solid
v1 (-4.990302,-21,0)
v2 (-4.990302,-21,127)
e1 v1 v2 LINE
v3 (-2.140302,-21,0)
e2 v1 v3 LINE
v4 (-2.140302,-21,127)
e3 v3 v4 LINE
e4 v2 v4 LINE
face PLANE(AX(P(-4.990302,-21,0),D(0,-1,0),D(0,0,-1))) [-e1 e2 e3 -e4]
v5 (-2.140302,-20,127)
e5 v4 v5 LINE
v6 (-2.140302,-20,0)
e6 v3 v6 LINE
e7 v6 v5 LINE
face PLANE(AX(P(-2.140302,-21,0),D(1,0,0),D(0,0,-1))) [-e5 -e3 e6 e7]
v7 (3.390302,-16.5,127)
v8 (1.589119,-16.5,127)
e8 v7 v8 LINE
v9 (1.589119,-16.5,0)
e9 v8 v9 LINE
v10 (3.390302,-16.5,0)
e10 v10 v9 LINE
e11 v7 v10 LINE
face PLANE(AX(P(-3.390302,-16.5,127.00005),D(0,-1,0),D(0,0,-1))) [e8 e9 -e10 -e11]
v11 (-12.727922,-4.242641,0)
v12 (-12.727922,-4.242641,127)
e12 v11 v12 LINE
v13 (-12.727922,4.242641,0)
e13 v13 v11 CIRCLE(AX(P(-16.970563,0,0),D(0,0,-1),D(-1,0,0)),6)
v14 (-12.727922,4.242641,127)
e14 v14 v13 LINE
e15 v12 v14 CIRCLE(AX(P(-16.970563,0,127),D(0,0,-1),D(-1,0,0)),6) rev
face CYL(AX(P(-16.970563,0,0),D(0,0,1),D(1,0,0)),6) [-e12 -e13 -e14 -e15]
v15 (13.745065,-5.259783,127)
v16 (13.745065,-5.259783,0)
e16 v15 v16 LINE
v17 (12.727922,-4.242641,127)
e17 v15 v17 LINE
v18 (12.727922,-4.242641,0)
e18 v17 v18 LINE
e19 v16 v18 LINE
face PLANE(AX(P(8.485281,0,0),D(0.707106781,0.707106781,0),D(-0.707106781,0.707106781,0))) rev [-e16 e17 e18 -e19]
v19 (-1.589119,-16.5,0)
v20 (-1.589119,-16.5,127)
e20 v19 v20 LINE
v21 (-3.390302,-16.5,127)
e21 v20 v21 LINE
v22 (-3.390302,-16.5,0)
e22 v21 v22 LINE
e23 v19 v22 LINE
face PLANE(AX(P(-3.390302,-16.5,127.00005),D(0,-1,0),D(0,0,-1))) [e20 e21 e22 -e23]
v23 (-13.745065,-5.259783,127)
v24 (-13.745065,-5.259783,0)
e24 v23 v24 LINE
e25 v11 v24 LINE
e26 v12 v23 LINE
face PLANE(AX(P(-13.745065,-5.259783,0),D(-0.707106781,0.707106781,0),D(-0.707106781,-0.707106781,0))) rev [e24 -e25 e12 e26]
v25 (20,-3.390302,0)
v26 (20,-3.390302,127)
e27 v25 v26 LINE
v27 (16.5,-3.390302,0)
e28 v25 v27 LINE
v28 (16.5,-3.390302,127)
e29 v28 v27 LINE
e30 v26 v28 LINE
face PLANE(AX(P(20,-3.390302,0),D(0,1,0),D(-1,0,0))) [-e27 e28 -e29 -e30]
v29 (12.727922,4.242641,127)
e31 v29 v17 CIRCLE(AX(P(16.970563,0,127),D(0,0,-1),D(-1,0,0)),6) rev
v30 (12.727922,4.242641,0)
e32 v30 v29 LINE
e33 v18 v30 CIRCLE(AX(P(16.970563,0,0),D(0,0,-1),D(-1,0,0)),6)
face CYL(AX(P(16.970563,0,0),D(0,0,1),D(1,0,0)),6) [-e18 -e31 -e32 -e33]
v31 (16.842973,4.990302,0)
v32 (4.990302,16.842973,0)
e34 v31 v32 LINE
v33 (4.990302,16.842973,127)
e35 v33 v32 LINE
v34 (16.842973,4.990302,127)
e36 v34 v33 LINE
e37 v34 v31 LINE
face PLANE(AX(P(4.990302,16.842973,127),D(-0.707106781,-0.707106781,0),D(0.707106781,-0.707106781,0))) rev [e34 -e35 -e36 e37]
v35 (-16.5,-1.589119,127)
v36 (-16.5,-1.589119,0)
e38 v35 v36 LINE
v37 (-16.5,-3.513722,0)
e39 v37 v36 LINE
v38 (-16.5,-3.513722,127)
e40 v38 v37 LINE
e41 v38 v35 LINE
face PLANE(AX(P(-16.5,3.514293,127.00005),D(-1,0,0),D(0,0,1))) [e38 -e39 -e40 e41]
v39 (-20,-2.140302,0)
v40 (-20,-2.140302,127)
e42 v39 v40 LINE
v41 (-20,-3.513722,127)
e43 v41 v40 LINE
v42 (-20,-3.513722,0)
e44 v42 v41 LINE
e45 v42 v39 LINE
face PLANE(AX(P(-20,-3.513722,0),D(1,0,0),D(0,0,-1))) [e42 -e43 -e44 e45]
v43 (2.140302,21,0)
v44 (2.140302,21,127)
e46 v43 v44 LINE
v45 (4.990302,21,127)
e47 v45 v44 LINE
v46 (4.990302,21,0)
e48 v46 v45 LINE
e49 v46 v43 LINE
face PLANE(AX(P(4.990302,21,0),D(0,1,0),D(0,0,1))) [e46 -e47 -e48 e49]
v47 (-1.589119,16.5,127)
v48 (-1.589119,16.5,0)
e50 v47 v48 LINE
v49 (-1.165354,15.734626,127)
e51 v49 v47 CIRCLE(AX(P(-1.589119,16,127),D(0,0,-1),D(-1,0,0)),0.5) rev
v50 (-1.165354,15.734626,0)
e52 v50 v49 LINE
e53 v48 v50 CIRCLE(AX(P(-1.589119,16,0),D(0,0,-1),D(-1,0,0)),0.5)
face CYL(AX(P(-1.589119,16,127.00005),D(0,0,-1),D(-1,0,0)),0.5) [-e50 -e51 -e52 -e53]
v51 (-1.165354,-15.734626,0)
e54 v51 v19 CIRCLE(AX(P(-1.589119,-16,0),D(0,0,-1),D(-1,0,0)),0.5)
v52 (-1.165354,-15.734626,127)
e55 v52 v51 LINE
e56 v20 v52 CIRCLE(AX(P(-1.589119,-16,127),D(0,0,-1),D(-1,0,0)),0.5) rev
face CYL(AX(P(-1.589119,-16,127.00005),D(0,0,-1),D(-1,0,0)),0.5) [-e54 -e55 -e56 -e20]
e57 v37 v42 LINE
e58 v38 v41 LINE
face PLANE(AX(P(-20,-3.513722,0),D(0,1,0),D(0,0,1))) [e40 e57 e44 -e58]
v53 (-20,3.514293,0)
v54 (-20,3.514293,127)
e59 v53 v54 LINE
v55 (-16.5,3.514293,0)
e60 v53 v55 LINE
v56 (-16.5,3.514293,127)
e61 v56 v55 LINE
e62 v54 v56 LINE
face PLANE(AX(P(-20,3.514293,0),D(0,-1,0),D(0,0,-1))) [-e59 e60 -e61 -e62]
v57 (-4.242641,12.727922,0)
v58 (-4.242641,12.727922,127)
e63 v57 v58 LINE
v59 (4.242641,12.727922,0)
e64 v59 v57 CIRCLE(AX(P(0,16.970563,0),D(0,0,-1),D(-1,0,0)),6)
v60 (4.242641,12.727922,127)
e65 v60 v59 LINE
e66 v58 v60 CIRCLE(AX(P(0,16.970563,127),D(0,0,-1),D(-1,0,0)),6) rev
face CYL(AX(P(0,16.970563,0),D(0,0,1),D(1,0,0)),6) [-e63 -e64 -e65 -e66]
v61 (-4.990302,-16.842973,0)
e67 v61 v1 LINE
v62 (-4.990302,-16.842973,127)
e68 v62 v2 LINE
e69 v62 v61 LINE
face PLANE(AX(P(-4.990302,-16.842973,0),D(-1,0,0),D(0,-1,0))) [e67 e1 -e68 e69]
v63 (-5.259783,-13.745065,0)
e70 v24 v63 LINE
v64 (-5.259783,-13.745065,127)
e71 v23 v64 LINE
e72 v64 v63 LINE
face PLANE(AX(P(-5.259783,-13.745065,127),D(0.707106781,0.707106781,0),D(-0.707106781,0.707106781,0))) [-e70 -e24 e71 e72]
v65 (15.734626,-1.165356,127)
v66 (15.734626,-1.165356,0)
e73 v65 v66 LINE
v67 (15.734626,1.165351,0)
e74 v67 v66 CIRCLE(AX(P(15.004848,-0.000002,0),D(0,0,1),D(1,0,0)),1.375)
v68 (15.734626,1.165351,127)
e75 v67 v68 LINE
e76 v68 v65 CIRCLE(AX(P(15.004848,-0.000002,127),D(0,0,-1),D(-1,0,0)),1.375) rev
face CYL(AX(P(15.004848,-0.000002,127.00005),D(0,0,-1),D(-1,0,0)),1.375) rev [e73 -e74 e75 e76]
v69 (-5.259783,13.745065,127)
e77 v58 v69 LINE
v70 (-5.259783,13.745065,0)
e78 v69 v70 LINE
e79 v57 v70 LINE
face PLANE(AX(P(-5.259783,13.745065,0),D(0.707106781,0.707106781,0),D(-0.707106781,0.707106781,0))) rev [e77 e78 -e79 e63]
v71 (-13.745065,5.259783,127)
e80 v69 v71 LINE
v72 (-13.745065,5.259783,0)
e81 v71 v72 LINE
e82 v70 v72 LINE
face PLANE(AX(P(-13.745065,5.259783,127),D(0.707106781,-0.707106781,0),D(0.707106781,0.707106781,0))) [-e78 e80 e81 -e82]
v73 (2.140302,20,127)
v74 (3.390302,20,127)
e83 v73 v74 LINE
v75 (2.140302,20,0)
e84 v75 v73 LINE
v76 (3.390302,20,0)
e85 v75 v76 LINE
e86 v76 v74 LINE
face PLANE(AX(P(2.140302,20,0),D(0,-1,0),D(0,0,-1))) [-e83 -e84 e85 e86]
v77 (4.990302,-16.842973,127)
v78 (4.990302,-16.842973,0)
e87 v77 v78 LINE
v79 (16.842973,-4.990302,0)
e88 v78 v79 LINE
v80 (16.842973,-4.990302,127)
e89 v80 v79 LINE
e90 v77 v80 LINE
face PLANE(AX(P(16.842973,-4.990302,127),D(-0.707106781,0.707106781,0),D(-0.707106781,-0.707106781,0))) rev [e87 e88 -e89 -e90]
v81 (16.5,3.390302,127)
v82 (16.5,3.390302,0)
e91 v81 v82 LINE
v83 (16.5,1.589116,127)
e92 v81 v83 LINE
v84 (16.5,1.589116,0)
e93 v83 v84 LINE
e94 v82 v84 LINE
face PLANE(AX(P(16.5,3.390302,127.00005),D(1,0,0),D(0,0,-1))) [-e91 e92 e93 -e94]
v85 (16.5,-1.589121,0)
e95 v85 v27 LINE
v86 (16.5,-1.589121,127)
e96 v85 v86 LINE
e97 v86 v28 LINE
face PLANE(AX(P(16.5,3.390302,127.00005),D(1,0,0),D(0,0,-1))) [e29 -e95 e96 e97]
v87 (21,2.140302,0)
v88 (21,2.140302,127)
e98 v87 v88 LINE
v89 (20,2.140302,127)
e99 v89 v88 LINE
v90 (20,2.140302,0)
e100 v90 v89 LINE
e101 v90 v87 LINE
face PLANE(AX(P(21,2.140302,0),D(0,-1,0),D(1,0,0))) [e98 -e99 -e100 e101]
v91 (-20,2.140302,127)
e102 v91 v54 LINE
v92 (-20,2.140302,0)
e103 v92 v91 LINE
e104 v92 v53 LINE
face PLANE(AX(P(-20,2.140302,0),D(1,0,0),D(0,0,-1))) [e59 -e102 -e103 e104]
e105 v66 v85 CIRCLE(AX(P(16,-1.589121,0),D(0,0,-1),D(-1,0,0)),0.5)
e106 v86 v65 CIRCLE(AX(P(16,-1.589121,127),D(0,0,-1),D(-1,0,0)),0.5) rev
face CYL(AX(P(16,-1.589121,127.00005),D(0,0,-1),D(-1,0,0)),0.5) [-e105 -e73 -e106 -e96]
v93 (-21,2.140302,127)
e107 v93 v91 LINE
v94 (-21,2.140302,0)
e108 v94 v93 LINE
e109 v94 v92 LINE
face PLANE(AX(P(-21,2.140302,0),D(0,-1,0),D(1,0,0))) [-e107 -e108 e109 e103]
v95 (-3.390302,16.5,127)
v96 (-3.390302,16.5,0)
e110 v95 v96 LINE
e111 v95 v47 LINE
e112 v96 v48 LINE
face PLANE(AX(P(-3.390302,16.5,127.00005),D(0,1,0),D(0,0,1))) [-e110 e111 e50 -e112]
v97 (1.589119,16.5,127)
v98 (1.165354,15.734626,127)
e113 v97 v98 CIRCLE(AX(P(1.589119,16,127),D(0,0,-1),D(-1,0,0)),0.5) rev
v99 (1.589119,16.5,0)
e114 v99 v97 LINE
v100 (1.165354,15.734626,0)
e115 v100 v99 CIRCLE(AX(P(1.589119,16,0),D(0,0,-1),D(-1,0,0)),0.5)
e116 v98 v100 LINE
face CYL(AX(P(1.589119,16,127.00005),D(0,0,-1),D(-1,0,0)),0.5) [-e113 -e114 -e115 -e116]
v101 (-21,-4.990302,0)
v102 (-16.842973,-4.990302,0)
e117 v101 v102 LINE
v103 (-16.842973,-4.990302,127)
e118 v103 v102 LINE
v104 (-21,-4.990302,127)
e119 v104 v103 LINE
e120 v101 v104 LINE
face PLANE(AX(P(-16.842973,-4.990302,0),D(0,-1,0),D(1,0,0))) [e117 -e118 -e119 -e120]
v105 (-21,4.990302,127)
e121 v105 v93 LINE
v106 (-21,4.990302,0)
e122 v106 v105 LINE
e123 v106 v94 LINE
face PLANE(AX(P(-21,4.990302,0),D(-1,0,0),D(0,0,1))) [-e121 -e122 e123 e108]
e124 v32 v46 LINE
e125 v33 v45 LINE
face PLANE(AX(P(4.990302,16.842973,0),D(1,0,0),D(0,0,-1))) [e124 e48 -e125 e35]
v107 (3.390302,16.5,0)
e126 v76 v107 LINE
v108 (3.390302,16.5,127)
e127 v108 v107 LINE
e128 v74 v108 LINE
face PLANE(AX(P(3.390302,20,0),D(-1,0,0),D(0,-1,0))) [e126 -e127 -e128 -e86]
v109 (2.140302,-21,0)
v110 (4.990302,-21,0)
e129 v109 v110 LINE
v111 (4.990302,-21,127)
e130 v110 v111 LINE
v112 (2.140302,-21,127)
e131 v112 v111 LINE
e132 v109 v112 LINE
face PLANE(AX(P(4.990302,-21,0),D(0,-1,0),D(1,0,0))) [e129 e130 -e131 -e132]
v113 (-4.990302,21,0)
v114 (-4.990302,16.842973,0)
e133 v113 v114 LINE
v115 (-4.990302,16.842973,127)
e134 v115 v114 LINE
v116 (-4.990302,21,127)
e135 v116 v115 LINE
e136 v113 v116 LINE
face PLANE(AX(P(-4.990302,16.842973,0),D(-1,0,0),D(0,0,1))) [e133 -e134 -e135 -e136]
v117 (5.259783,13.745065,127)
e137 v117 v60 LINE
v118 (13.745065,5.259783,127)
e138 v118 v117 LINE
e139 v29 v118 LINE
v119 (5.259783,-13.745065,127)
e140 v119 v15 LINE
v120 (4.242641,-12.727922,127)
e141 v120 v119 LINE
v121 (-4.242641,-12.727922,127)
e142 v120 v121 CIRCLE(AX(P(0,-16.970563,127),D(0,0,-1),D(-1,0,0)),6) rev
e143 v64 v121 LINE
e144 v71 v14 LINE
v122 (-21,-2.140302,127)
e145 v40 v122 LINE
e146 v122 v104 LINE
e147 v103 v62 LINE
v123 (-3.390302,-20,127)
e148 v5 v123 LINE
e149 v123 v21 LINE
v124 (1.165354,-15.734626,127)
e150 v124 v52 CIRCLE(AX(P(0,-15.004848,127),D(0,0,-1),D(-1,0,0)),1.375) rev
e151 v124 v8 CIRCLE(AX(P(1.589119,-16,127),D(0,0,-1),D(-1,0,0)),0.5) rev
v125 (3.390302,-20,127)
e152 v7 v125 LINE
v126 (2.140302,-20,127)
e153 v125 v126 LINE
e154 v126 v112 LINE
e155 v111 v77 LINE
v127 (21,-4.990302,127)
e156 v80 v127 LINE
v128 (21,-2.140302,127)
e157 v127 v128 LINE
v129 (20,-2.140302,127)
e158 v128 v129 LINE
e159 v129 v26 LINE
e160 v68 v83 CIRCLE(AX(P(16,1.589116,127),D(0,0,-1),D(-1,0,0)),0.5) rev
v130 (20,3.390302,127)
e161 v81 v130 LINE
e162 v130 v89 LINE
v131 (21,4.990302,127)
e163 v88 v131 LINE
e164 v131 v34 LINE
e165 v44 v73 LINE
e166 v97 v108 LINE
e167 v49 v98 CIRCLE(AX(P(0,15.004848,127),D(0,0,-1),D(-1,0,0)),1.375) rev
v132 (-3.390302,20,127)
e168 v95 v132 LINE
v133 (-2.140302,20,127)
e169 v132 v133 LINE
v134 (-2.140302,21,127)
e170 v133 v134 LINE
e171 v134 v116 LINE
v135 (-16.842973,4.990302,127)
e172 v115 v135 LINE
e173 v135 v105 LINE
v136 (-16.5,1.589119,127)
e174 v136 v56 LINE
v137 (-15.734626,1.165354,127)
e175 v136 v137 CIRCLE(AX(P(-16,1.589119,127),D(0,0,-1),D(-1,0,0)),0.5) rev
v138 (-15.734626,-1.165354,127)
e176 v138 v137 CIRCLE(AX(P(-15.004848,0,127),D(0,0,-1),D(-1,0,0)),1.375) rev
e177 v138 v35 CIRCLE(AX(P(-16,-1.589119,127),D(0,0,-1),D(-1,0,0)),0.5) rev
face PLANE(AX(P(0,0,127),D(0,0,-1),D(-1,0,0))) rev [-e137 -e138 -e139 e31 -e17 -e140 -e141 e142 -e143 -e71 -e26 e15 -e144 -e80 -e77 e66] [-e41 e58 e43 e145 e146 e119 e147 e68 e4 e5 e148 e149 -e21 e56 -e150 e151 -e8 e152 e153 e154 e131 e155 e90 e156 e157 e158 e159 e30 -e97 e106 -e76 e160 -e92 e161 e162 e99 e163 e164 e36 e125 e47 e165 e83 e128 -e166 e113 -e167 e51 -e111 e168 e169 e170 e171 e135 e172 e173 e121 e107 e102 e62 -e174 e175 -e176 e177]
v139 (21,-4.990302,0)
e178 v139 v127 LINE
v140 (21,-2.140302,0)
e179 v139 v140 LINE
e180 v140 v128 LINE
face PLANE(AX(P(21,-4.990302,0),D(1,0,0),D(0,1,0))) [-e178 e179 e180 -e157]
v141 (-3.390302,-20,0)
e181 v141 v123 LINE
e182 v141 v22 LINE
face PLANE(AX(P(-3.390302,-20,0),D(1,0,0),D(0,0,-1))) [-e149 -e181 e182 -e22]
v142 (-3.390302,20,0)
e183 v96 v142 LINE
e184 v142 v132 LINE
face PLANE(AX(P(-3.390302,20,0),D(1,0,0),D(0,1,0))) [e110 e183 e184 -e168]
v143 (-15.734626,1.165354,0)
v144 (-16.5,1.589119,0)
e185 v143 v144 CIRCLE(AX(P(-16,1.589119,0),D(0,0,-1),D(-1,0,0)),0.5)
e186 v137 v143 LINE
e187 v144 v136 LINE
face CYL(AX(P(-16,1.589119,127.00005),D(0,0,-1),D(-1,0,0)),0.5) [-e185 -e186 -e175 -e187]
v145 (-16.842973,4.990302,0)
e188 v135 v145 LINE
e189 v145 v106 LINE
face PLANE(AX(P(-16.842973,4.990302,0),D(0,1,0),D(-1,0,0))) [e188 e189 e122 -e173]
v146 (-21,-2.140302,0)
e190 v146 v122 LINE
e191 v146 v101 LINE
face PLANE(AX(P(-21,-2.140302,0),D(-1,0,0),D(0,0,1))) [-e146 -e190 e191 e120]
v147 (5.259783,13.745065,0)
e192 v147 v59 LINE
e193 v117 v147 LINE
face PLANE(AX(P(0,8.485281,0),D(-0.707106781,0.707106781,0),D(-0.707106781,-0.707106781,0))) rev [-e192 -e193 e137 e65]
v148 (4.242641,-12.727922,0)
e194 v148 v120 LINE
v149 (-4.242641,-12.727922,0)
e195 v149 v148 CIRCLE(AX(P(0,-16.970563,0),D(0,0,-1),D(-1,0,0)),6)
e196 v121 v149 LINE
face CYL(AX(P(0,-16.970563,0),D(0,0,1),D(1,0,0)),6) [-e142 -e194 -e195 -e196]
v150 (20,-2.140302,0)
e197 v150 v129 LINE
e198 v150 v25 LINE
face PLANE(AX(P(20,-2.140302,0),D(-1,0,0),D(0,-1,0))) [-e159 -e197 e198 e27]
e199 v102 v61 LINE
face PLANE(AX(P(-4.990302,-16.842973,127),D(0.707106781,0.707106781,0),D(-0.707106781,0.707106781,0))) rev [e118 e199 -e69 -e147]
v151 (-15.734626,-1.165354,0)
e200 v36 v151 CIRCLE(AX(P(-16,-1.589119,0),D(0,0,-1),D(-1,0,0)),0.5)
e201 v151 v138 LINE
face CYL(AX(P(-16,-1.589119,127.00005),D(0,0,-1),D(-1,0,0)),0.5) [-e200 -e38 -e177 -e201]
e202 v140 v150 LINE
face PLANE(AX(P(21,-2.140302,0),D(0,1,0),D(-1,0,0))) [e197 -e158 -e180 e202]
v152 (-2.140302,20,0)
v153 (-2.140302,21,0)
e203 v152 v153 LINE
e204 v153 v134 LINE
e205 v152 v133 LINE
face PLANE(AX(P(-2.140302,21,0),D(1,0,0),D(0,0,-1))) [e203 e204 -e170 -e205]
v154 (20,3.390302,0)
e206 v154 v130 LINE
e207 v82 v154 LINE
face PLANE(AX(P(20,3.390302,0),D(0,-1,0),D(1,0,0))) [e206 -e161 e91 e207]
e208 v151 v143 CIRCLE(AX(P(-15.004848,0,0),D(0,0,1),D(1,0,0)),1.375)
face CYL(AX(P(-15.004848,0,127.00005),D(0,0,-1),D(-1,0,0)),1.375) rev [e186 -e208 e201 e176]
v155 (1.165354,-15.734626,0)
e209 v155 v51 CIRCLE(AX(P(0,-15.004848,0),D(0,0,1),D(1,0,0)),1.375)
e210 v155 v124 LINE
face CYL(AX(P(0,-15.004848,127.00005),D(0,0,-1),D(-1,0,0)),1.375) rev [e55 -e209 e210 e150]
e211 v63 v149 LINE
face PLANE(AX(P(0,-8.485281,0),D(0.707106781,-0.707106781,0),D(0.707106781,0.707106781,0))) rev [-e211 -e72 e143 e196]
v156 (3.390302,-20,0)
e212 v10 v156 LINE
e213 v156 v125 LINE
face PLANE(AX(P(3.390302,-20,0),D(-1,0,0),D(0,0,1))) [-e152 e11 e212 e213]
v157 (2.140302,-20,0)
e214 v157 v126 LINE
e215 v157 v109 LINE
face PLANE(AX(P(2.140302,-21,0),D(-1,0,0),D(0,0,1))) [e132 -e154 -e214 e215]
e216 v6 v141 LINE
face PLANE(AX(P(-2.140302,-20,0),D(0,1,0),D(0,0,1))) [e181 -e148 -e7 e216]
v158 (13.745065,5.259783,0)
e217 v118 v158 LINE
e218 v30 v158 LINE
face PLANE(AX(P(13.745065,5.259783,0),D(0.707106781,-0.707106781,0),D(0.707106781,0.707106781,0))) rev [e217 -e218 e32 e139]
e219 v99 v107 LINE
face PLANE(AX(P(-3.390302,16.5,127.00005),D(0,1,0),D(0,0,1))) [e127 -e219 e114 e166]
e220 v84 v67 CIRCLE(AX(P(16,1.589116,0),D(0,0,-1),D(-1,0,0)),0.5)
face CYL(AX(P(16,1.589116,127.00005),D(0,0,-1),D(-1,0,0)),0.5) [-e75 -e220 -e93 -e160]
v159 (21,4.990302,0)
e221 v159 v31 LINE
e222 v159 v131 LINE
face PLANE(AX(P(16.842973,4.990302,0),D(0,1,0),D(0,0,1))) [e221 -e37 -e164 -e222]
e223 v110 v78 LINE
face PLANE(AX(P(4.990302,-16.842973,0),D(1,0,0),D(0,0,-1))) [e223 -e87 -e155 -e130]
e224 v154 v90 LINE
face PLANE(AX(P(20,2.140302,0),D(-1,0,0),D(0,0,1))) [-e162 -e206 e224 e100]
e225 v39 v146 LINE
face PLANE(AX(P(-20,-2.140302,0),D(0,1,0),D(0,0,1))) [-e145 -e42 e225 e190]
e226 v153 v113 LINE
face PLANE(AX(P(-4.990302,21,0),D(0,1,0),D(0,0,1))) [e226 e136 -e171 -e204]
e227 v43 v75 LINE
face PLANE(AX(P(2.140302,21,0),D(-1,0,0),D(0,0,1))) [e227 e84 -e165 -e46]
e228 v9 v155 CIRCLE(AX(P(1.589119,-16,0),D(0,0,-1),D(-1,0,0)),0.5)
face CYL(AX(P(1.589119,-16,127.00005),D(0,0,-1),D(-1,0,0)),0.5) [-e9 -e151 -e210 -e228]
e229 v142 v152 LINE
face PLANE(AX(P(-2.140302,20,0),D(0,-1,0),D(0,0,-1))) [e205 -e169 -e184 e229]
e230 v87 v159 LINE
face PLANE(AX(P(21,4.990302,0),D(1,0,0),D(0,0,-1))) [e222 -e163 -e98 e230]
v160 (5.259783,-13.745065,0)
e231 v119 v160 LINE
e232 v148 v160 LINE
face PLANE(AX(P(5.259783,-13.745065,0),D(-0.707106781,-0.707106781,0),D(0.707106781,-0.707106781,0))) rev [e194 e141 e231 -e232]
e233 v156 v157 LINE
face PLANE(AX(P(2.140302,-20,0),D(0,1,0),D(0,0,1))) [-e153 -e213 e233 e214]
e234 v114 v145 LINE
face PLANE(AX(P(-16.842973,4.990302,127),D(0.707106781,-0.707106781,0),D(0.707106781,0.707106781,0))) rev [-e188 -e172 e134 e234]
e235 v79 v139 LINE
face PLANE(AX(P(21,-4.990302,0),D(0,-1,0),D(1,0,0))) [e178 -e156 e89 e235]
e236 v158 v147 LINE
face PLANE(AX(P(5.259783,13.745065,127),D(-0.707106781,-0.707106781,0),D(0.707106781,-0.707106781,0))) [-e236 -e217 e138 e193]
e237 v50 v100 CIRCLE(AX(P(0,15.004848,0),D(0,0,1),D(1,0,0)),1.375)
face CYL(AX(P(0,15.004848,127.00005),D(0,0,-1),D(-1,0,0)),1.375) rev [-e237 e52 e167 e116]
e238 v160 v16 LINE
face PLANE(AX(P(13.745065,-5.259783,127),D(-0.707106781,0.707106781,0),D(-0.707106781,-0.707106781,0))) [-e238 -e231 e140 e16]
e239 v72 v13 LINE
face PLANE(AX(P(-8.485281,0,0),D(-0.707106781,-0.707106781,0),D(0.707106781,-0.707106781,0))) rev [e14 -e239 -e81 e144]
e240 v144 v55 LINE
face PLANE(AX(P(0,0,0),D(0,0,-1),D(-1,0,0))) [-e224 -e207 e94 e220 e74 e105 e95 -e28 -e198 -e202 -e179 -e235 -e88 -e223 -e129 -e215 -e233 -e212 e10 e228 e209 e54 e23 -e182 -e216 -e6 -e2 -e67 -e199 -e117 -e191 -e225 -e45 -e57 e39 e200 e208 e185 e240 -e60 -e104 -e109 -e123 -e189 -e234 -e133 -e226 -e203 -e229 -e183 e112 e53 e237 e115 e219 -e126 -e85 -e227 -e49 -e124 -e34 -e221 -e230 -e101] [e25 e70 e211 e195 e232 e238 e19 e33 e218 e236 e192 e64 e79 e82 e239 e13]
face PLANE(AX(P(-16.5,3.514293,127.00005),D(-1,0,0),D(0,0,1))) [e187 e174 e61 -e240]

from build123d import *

# Parameters (mm, degrees)
BOSS_EXTRUDE1_DEPTH = 127
BOSS_EXTRUDE4_DEPTH = 127
SKETCH7_R           = 1.375
SKETCH7_R_2         = 1.375000009
SKETCH7_R_3         = 1.374999997
SKETCH7_W           = 3.5
SKETCH7_H           = 7.028015283
SKETCH7_W_2         = 6.780603604
SKETCH7_H_2         = 3.5
SKETCH7_H_3         = 6.780603604
CUT_EXTRUDE2_DEPTH  = 131.426224357
SKETCH8_W           = 2.834613859
SKETCH8_H           = 1
SKETCH8_W_2         = 1
SKETCH8_H_2         = 2.748258962
SKETCH8_W_3         = 3.182807673
SKETCH8_H_3         = 2.560440129
CUT_EXTRUDE3_DEPTH  = 131.426224357
FILLET3_R           = 0.5
FILLET4_R           = 0.5
BOSS_EXTRUDE6_DEPTH = 127
FILLET5_R           = 6


# Some blends are built 0.0001 mm under size
with BuildPart() as part:
    # Sketch1 → Boss-Extrude1 (new body)
    with BuildSketch(Plane.XY):
        Polygon((4.990301802, 16.842973424), (16.842973424, 4.990301802), (16.842973424, -4.990301802), (4.990301802, -16.842973424), (-4.990301802, -16.842973424), (-16.842973424, -4.990301802), (-16.842973424, 4.990301802), (-4.990301802, 16.842973424), align=None)
        with BuildLine():
            Line((-13.745064738, 5.259783364), (-5.259783364, 13.745064738))
            ThreePointArc((-5.259783364, 13.745064738), (0, 11.566391134), (5.259783364, 13.745064738))
            Line((5.259783364, 13.745064738), (13.745064738, 5.259783364))
            ThreePointArc((13.745064738, 5.259783364), (11.566391134, 0), (13.745064738, -5.259783364))
            Line((13.745064738, -5.259783364), (5.259783364, -13.745064738))
            ThreePointArc((5.259783364, -13.745064738), (0, -11.566391134), (-5.259783364, -13.745064738))
            Line((-5.259783364, -13.745064738), (-13.745064738, -5.259783364))
            ThreePointArc((-13.745064738, -5.259783364), (-11.566391134, 0), (-13.745064738, 5.259783364))
        make_face(mode=Mode.SUBTRACT)
    extrude(amount=BOSS_EXTRUDE1_DEPTH)

    # Sketch5 → Boss-Extrude4 (add, through all)
    with BuildSketch(Plane.XY.offset(127)):
        Polygon((-16.842973424, -4.990301802), (-21, -4.990301802), (-21, -2.140301802), (-20, -2.140301802), (-20, -3.513722258), (-16.842973424, -3.513722258), align=None)
        Polygon((-16.842973424, 4.990301802), (-21, 4.990301802), (-21, 2.140301802), (-20, 2.140301802), (-20, 3.514293025), (-16.842973424, 3.514293025), align=None)
        Polygon((16.842973424, 4.990301802), (21, 4.990301802), (21, 2.140301802), (20, 2.140301802), (20, 3.390301802), (16.842973424, 3.390301802), align=None)
        Polygon((21, -4.990301802), (16.842973424, -4.990301802), (16.842973424, -3.390301802), (20, -3.390301802), (20, -2.140301802), (21, -2.140301802), align=None)
        Polygon((3.390301802, 16.842973424), (4.990301802, 16.842973424), (4.990301802, 21), (2.140301802, 21), (2.140301802, 20), (3.390301802, 20), align=None)
        Polygon((-4.990301802, 16.842973424), (-4.990301802, 21), (-2.140301802, 21), (-2.140301802, 20), (-3.390301802, 20), (-3.390301802, 16.842973424), align=None)
        Polygon((4.990301802, -16.842973424), (4.990301802, -21), (2.140301802, -21), (2.140301802, -20), (3.390301802, -20), (3.390301802, -16.842973424), align=None)
        Polygon((-4.990301802, -16.842973424), (-4.990301802, -21), (-2.140301802, -21), (-2.140301802, -20), (-3.390301802, -20), (-3.390301802, -16.842973424), align=None)
    extrude(amount=-BOSS_EXTRUDE4_DEPTH)

    # Sketch7 → Cut-Extrude2 (cut, through all)
    with BuildSketch(Plane.XY):
        with Locations(Location((-15.004848102, 0, 0), (0, 0, 180))):
            Circle(SKETCH7_R)
        with Locations(Location((3e-09, 15.004848102, 0), (0, 0, 180))):
            Circle(SKETCH7_R)
        with Locations(Location((15.004848102, -2.203e-06, 0), (0, 0, 180))):
            Circle(SKETCH7_R_2)
        with Locations(Location((0, -15.004848102, 0), (0, 0, 180))):
            Circle(SKETCH7_R_3)
        with Locations((-18.25, 0.000285384)):
            Rectangle(SKETCH7_W, SKETCH7_H)
        with Locations((0, 18.25)):
            Rectangle(SKETCH7_W_2, SKETCH7_H_2)
        with Locations((18.25, 0)):
            Rectangle(SKETCH7_W, SKETCH7_H_3)
        with Locations((0, -18.25)):
            Rectangle(SKETCH7_W_2, SKETCH7_H_2)
    extrude(amount=CUT_EXTRUDE2_DEPTH, mode=Mode.SUBTRACT)

    # Sketch8 → Cut-Extrude3 (cut, through all)
    with BuildSketch(Plane.XY.offset(127)):
        with Locations((-16.422155032, 0)):
            Rectangle(SKETCH8_W, SKETCH8_H)
        with Locations((0, 16.378977583)):
            Rectangle(SKETCH8_W_2, SKETCH8_H_2)
        with Locations((16.596251939, 0)):
            Rectangle(SKETCH8_W_3, SKETCH8_H)
        with Locations((0, -16.285068167)):
            Rectangle(SKETCH8_W_2, SKETCH8_H_3)
    extrude(amount=-CUT_EXTRUDE3_DEPTH, mode=Mode.SUBTRACT)

    # Fillet3
    # the kernel refuses this fillet: 0.5 mm, written as the material it takes off along each edge
    with BuildSketch(Plane(origin=(-16.5, 0.5, -1.025810125), x_dir=(0, 1, 0), z_dir=(0, 0, 1))) as fillet3_piece_1:
        with BuildLine():
            CenterArc((0.41032405, -0.5), FILLET3_R, 90, 55.149723763)
            Line((0, -0.214283053), (-0.008206481, -0.208568714))
            ThreePointArc((-0.008206481, -0.208568714), (-0.01, -0.107141526), (-0.01, 0))
            Line((-0.01, 0), (0, 0.01))
            Line((0, 0.01), (0.41032405, 0.01))
            Line((0.41032405, 0.01), (0.41032405, 0))
        make_face()
    extrude(amount=129.05162025, mode=Mode.SUBTRACT)
    with BuildSketch(Plane(origin=(0.5, -16.5, -1.02581013), x_dir=(5.296643708926083e-12, 1.0, 0), z_dir=(0, 0, 1))) as fillet3_piece_2:
        with BuildLine():
            CenterArc((0.5, -0.410324052), FILLET3_R, 124.850275833, 55.149724167)
            Line((0, -0.410324052), (-0.01, -0.410324052))
            Line((-0.01, -0.410324052), (-0.01, 0))
            Line((-0.01, 0), (0, 0.01))
            ThreePointArc((0, 0.01), (0.107141528, 0.01), (0.208568717, 0.008206481))
            Line((0.208568717, 0.008206481), (0.214283056, 0))
        make_face()
    extrude(amount=129.05162026, mode=Mode.SUBTRACT)
    with BuildSketch(Plane(origin=(-0.5, -16.5, 128.02581013), x_dir=(-1, 0, 0), z_dir=(0, 0, -1))) as fillet3_piece_3:
        with BuildLine():
            CenterArc((0.410324052, 0.5), FILLET3_R, 214.850275833, 55.149724167)
            Line((0, 0.214283056), (-0.008206481, 0.208568717))
            ThreePointArc((-0.008206481, 0.208568717), (-0.01, 0.107141528), (-0.01, 0))
            Line((-0.01, 0), (0, -0.01))
            Line((0, -0.01), (0.410324052, -0.01))
            Line((0.410324052, -0.01), (0.410324052, 0))
        make_face()
    extrude(amount=129.05162026, mode=Mode.SUBTRACT)
    with BuildSketch(Plane(origin=(16.5, -0.5, -1.025808612), x_dir=(0, -1, 0), z_dir=(0, 0, 1))) as fillet3_piece_4:
        with BuildLine():
            CenterArc((0.410323445, -0.5), FILLET3_R, 90, 55.149602377)
            Line((0, -0.214282183), (-0.008206469, -0.208567827))
            ThreePointArc((-0.008206469, -0.208567827), (-0.01, -0.107141092), (-0.01, 0))
            Line((-0.01, 0), (0, 0.01))
            Line((0, 0.01), (0.410323445, 0.01))
            Line((0.410323445, 0.01), (0.410323445, 0))
        make_face()
    extrude(amount=129.051617223, mode=Mode.SUBTRACT)
    with BuildSketch(Plane(origin=(16.5, 0.5, 128.025811605), x_dir=(-1.0, 5.295068435052625e-12, 0), z_dir=(0, 0, -1))) as fillet3_piece_5:
        with BuildLine():
            CenterArc((0.5, 0.410324642), FILLET3_R, 180, 55.149842509)
            Line((0, 0.410324642), (-0.01, 0.410324642))
            Line((-0.01, 0.410324642), (-0.01, 0))
            Line((-0.01, 0), (0, -0.01))
            ThreePointArc((0, -0.01), (0.107141952, -0.01), (0.208569581, -0.008206493))
            Line((0.208569581, -0.008206493), (0.214283903, 0))
        make_face()
    extrude(amount=129.051623211, mode=Mode.SUBTRACT)
    with BuildSketch(Plane(origin=(-0.5, 16.5, -1.025810127), x_dir=(-5.291980756940643e-12, -1.0, 0), z_dir=(0, 0, 1))) as fillet3_piece_6:
        with BuildLine():
            CenterArc((0.5, -0.410324051), FILLET3_R, 124.850276074, 55.149723926)
            Line((0, -0.410324051), (-0.01, -0.410324051))
            Line((-0.01, -0.410324051), (-0.01, 0))
            Line((-0.01, 0), (0, 0.01))
            ThreePointArc((0, 0.01), (0.107141527, 0.01), (0.208568715, 0.008206481))
            Line((0.208568715, 0.008206481), (0.214283054, 0))
        make_face()
    extrude(amount=129.051620254, mode=Mode.SUBTRACT)
    with BuildSketch(Plane(origin=(0.5, 16.5, 128.025810123), x_dir=(1, 0, 0), z_dir=(0, 0, -1))) as fillet3_piece_7:
        with BuildLine():
            CenterArc((0.410324049, 0.5), FILLET3_R, 214.8502764, 55.1497236)
            Line((0, 0.214283051), (-0.008206481, 0.208568713))
            ThreePointArc((-0.008206481, 0.208568713), (-0.01, 0.107141526), (-0.01, 0))
            Line((-0.01, 0), (0, -0.01))
            Line((0, -0.01), (0.410324049, -0.01))
            Line((0.410324049, -0.01), (0.410324049, 0))
        make_face()
    extrude(amount=129.051620246, mode=Mode.SUBTRACT)
    with BuildSketch(Plane(origin=(-16.5, -0.5, 128.025810125), x_dir=(1.0, -5.296125669893669e-12, 0), z_dir=(0, 0, -1))) as fillet3_piece_8:
        with BuildLine():
            CenterArc((0.5, 0.41032405), FILLET3_R, 180, 55.149723763)
            Line((0, 0.41032405), (-0.01, 0.41032405))
            Line((-0.01, 0.41032405), (-0.01, 0))
            Line((-0.01, 0), (0, -0.01))
            ThreePointArc((0, -0.01), (0.107141526, -0.01), (0.208568714, -0.008206481))
            Line((0.208568714, -0.008206481), (0.214283053, 0))
        make_face()
    extrude(amount=129.05162025, mode=Mode.SUBTRACT)

    # Fillet4
    fillet4_edges = [part.edges().sort_by_distance(p)[0] for p in [
        (-16.285716947, 0.5, 63.5),
        (0.5, -16.285716944, 63.5),
        (-0.5, -16.285716944, 63.5),
        (16.285717817, -0.5, 63.5),
        (16.285716097, 0.5, 63.5),
        (-0.5, 16.285716946, 63.5),
        (0.5, 16.285716949, 63.5),
        (-16.285716947, -0.5, 63.5),
    ]]
    fillet(fillet4_edges, radius=FILLET4_R - 0.0001)  # a hair under: the kernel refuses the full size

    # Sketch9 → Boss-Extrude6 (add, through all)
    with BuildSketch(Plane.XY.offset(127)):
        with BuildLine():
            Line((-4.990301802, 16.842973424), (-16.842973424, 4.990301802))
            ThreePointArc((-16.842973424, 4.990301802), (-11.852671623, 0), (-16.842973424, -4.990301802))
            Line((-16.842973424, -4.990301802), (-4.990301802, -16.842973424))
            ThreePointArc((-4.990301802, -16.842973424), (0, -11.852671623), (4.990301802, -16.842973424))
            Line((4.990301802, -16.842973424), (16.842973424, -4.990301802))
            ThreePointArc((16.842973424, -4.990301802), (11.852671623, 0), (16.842973424, 4.990301802))
            Line((16.842973424, 4.990301802), (4.990301802, 16.842973424))
            ThreePointArc((4.990301802, 16.842973424), (0, 11.852671623), (-4.990301802, 16.842973424))
        make_face()
        Polygon((-5.259783364, 13.745064738), (-13.745064738, 5.259783364), (-8.485281374, 0), (-13.745064738, -5.259783364), (-5.259783364, -13.745064738), (0, -8.485281374), (5.259783364, -13.745064738), (13.745064738, -5.259783364), (8.485281374, 0), (13.745064738, 5.259783364), (5.259783364, 13.745064738), (0, 8.485281374), align=None, mode=Mode.SUBTRACT)
    extrude(amount=-BOSS_EXTRUDE6_DEPTH)

    # Fillet5
    fillet5_edges = [part.edges().sort_by_distance(p)[0] for p in [
        (0, 8.485281374, 63.5),
        (8.485281374, 0, 63.5),
        (0, -8.485281374, 63.5),
        (-8.485281374, 0, 63.5),
    ]]
    fillet(fillet5_edges, radius=FILLET5_R)


solid = part.part
